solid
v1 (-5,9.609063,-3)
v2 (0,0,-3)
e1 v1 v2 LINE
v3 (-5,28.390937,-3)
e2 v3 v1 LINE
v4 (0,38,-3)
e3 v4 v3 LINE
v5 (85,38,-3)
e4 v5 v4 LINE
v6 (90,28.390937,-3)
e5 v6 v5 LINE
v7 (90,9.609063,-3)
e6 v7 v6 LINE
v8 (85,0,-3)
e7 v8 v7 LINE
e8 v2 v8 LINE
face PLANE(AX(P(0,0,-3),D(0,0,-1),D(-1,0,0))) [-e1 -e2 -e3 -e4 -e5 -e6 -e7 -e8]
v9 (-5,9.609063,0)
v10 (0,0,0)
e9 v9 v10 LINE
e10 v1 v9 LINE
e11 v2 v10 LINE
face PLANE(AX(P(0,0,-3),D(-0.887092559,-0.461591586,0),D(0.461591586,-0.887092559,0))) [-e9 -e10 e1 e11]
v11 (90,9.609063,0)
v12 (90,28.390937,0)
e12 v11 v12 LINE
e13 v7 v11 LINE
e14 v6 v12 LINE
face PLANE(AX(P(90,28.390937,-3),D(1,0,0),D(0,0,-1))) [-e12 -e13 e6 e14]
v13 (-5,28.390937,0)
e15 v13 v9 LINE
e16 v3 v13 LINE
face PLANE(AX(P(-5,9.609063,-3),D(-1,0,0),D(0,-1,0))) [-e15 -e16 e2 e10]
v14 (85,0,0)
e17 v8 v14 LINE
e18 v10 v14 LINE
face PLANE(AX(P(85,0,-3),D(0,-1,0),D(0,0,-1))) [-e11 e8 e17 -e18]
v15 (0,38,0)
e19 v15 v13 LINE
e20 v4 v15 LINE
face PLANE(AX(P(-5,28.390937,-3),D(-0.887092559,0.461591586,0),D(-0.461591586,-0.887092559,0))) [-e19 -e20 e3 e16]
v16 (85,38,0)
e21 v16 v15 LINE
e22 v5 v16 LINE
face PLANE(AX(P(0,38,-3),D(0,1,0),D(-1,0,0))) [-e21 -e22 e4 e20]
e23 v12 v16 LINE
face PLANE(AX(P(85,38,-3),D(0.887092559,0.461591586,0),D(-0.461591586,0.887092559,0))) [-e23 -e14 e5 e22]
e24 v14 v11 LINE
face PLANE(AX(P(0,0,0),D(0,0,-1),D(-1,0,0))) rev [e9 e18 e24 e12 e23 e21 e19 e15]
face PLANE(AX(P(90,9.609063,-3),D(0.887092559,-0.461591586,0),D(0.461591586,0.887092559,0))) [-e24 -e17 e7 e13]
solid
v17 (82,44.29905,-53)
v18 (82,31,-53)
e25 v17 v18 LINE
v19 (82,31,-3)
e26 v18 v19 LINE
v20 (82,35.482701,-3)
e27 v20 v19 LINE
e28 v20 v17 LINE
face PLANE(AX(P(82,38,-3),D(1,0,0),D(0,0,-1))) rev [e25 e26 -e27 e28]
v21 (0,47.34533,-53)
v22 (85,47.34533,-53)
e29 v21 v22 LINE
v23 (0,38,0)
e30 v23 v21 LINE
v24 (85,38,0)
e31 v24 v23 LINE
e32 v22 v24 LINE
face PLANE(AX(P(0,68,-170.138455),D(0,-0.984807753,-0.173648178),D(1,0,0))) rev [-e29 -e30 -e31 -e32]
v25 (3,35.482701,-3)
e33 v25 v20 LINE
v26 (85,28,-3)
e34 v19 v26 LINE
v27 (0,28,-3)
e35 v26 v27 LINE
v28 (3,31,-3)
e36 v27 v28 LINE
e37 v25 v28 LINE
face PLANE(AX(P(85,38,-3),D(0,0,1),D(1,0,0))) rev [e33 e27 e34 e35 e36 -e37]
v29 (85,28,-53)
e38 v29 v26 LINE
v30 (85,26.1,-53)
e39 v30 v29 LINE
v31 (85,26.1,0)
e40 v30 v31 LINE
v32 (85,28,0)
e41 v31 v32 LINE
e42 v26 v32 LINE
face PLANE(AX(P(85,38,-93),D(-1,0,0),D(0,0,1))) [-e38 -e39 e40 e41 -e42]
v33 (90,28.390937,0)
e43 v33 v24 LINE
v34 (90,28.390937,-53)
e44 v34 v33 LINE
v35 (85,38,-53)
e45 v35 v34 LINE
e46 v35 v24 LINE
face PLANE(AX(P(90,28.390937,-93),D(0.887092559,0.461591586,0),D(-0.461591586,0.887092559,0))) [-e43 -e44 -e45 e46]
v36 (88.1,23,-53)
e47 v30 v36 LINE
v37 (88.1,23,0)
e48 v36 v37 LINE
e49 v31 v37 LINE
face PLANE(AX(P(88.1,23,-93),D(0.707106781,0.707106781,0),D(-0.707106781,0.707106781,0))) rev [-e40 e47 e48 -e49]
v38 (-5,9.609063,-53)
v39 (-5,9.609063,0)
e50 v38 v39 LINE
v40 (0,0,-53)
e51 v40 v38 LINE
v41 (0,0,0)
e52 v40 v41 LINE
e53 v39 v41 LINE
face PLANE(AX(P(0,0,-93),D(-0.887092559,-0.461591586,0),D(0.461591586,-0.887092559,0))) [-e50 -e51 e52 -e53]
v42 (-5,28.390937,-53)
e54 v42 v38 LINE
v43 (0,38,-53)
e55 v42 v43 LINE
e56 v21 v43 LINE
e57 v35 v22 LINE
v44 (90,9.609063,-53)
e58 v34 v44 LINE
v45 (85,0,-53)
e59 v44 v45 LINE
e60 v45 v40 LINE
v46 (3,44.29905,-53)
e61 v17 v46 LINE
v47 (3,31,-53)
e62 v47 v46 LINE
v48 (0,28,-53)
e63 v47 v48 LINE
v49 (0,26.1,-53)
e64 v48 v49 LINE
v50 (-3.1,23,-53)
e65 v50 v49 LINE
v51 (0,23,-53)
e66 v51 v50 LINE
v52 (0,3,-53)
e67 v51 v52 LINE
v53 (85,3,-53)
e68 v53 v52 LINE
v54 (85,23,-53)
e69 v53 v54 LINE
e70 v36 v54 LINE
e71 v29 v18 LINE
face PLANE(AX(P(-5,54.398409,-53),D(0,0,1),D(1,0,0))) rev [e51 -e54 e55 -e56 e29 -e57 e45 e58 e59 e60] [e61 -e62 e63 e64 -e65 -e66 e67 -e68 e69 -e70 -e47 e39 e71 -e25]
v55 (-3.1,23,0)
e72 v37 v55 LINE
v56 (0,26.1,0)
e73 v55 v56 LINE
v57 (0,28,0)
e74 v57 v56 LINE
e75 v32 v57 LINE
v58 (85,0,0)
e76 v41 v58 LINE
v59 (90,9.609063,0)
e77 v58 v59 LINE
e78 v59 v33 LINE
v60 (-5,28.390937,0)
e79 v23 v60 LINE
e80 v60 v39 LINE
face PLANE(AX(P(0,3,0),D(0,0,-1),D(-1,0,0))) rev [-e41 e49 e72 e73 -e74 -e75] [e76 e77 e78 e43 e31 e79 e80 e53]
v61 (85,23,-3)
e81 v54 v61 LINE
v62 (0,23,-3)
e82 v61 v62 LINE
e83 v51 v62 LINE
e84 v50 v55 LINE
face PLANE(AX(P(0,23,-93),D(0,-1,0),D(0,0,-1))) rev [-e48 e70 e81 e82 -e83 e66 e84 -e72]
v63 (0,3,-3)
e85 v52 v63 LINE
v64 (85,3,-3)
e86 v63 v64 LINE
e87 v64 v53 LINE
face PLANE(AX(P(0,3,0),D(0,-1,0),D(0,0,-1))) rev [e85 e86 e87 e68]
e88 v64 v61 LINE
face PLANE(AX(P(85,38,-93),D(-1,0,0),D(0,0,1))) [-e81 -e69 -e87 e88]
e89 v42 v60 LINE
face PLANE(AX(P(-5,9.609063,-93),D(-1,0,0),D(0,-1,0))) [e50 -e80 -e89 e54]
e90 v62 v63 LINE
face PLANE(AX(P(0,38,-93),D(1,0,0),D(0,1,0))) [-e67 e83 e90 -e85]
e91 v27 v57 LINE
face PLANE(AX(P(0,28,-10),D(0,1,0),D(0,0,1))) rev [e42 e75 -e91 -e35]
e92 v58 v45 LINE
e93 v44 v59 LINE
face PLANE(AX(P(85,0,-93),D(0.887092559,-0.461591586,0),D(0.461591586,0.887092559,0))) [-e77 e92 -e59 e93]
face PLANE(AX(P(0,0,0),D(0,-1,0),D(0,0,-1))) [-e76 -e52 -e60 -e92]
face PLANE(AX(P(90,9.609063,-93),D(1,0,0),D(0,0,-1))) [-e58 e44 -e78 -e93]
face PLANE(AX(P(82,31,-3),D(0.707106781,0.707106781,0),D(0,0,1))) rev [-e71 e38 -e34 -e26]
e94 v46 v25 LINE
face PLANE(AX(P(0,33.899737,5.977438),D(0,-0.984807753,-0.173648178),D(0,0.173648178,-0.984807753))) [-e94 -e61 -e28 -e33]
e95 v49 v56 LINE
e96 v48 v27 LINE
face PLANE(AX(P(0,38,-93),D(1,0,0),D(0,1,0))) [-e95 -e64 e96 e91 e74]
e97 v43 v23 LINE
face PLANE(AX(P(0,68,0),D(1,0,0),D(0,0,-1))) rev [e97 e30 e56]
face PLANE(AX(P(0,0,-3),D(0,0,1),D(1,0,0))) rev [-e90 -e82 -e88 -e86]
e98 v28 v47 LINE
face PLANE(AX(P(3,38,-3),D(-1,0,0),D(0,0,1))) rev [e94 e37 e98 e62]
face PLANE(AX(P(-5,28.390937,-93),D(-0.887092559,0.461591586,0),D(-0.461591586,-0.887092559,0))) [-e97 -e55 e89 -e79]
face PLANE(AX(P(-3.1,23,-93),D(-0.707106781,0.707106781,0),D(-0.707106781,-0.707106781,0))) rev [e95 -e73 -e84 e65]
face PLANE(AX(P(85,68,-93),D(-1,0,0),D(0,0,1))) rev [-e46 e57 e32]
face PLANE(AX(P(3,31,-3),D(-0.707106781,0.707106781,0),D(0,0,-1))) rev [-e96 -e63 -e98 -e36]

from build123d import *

# Parameters (mm, degrees)
SKETCH1_W                      = 85
SKETCH1_H                      = 93
BOSS_EXTRUDE1_BASE_DEPTH       = 3
BOSS_EXTRUDE4_SIDE_WALLS_DEPTH = 93
CUT_EXTRUDE2_START             = 3
CUT_EXTRUDE2_GUIDE_HOLES_DEPTH = 138.881429411
SKETCH15_W                     = 85
SKETCH15_H                     = 20
BOSS_EXTRUDE9_REAR_WALL_DEPTH  = 3
BOSS_EXTRUDE1_START            = 3
SKETCH17_W                     = 85
SKETCH17_H                     = 3
BOSS_EXTRUDE1_REAR_WALL_DEPTH  = 12
SKETCH30_W                     = 85
SKETCH30_H                     = 2
CUT_EXTRUDE1_REAR_WALL_DEPTH   = 10
BOSS_EXTRUDE2_START            = 25
SKETCH20_W                     = 3
SKETCH20_H                     = 90
BOSS_EXTRUDE2_SIDE_WALL_DEPTH  = 10
CHAMFER1_SIDE_WALL_SIZE        = 3
BOSS_EXTRUDE5_SIDE_WALL_DEPTH  = 30
CHAMFER2_ROOF_SIZE             = 30
CHAMFER2_ROOF_SIZE_2           = 170.138454589
SKETCH28_W                     = 85
SKETCH28_H                     = 94.434674906
BOSS_EXTRUDE7_ROOF_DEPTH       = 3
SKETCH29_W                     = 5.082998623
SKETCH29_H                     = 55.59785115
CUT_EXTRUDE1_CLEAN_UP_DEPTH    = 144.980394466
SKETCH31_W                     = 95
SKETCH31_H                     = 40
CUT_EXTRUDE2_CLEAN_UP_DEPTH    = 141.385850156
BOSS_EXTRUDE1_DEPTH            = 3


# Some blends are built 0.0001 mm under size
with BuildPart() as part:
    # Sketch1 → Boss-Extrude1 _Base (new body)
    with BuildSketch(Plane(origin=(0, 0, 0), x_dir=(1, 0, 0), z_dir=(0, 1, 0))):
        with Locations((42.5, 46.5)):
            Rectangle(SKETCH1_W, SKETCH1_H)
    extrude(amount=BOSS_EXTRUDE1_BASE_DEPTH)

    # Sketch5 → Boss-Extrude4 _Side Walls (add, through all)
    with BuildSketch(Plane.XY):
        Polygon((-5, 28.390936655), (0, 38), (0, 0), (-5, 9.609063345), align=None)
        Polygon((90, 9.609063345), (90, 28.390936655), (85, 38), (85, 0), align=None)
    extrude(amount=-BOSS_EXTRUDE4_SIDE_WALLS_DEPTH)

    # Sketch4 → Cut-Extrude2 _Guide Holes (cut, through all)
    with BuildSketch(Plane.XY.offset(CUT_EXTRUDE2_START)):
        Polygon((-3.1, 23), (0, 26.1), (0, 23), align=None)
        Polygon((85, 23), (88.1, 23), (85, 26.1), align=None)
    extrude(amount=-CUT_EXTRUDE2_GUIDE_HOLES_DEPTH, mode=Mode.SUBTRACT)

    # Sketch15 → Boss-Extrude9 _Rear Wall (add)
    with BuildSketch(Plane.XY):
        with Locations((42.5, 13)):
            Rectangle(SKETCH15_W, SKETCH15_H)
    extrude(amount=-BOSS_EXTRUDE9_REAR_WALL_DEPTH)

    # Sketch17 → Boss-Extrude1 _Rear Wall (add)
    with BuildSketch(Plane(origin=(0, 23, 0), x_dir=(1, 0, 0), z_dir=(0, 1, 0)).offset(BOSS_EXTRUDE1_START)):
        with Locations((42.5, 1.5)):
            Rectangle(SKETCH17_W, SKETCH17_H)
    extrude(amount=BOSS_EXTRUDE1_REAR_WALL_DEPTH)

    # Sketch30 → Cut-Extrude1 _Rear Wall (cut)
    with BuildSketch(Plane.XY):
        with Locations((42.5, 27)):
            Rectangle(SKETCH30_W, SKETCH30_H)
    extrude(amount=-CUT_EXTRUDE1_REAR_WALL_DEPTH, mode=Mode.SUBTRACT)

    # Sketch20 → Boss-Extrude2 _Side Wall (add)
    with BuildSketch(Plane(origin=(0, 3, 0), x_dir=(1, 0, 0), z_dir=(0, 1, 0)).offset(BOSS_EXTRUDE2_START)):
        with Locations((1.5, 48)):
            Rectangle(SKETCH20_W, SKETCH20_H)
        with Locations((83.5, 48)):
            Rectangle(SKETCH20_W, SKETCH20_H)
    extrude(amount=BOSS_EXTRUDE2_SIDE_WALL_DEPTH)

    # Chamfer1 _Side Wall
    chamfer1_side_wall_edges = [part.edges().sort_by_distance(p)[0] for p in [
        (82, 28, -48),
        (3, 28, -48),
    ]]
    chamfer(chamfer1_side_wall_edges, length=CHAMFER1_SIDE_WALL_SIZE - 0.0001)  # a hair under: the kernel refuses the full size

    # Sketch26 → Boss-Extrude5 _Side Wall (add)
    with BuildSketch(Plane(origin=(0, 38, 0), x_dir=(1, 0, 0), z_dir=(0, 1, 0))):
        Polygon((0, 0), (0, 93), (3, 93), (3, 3), (82, 3), (82, 93), (85, 93), (85, 0), align=None)
    extrude(amount=BOSS_EXTRUDE5_SIDE_WALL_DEPTH)

    # Chamfer2 _Roof
    # the kernel refuses this chamfer: 170.138454589, 30 mm, written as the material it takes off along each edge
    with BuildSketch(Plane(origin=(527.111375011, 68, 0), x_dir=(0, -0.9776715712462578, 0.21013876076743532), z_dir=(-1, 0, 0))) as chamfer2_roof_piece_1:
        Polygon((CHAMFER2_ROOF_SIZE * 0.977671571246, -CHAMFER2_ROOF_SIZE * 0.210138760767), (-CHAMFER2_ROOF_SIZE_2 * 0.210138760767, -CHAMFER2_ROOF_SIZE_2 * 0.977671571244), (0, 0), align=None)
    extrude(amount=969.222750023, mode=Mode.SUBTRACT)

    # Sketch28 → Boss-Extrude7 _Roof (add)
    with BuildSketch(Plane(origin=(0, 36.854159795, 6.498382723), x_dir=(1, 0, 0), z_dir=(0, 0.9848077530122086, 0.17364817766692742))):
        with Locations((42.5, 53.815968204)):
            Rectangle(SKETCH28_W, SKETCH28_H)
    extrude(amount=-BOSS_EXTRUDE7_ROOF_DEPTH)

    # Sketch29 → Cut-Extrude1 _Clean up (cut, through all)
    with BuildSketch(Plane(origin=(90, 0, 0), x_dir=(0, 0, -1), z_dir=(1, 0, 0))):
        with Locations((95.541499312, 27.798925575)):
            Rectangle(SKETCH29_W, SKETCH29_H)
    extrude(amount=-CUT_EXTRUDE1_CLEAN_UP_DEPTH, mode=Mode.SUBTRACT)

    # Sketch31 → Cut-Extrude2 _Clean Up (cut, through all)
    with BuildSketch(Plane.XZ):
        with Locations((42.5, -73)):
            Rectangle(SKETCH31_W, SKETCH31_H)
    extrude(amount=-CUT_EXTRUDE2_CLEAN_UP_DEPTH, mode=Mode.SUBTRACT)


with BuildPart() as body_2:
    # Sketch33 → Boss-Extrude1 (new body)
    with BuildSketch(Plane.XY):
        Polygon((-5, 28.390936655), (0, 38), (85, 38), (90, 28.390936655), (90, 9.609063345), (85, 0), (0, 0), (-5, 9.609063345), align=None)
    extrude(amount=-BOSS_EXTRUDE1_DEPTH)


solid = Compound([part.part, body_2.part])
